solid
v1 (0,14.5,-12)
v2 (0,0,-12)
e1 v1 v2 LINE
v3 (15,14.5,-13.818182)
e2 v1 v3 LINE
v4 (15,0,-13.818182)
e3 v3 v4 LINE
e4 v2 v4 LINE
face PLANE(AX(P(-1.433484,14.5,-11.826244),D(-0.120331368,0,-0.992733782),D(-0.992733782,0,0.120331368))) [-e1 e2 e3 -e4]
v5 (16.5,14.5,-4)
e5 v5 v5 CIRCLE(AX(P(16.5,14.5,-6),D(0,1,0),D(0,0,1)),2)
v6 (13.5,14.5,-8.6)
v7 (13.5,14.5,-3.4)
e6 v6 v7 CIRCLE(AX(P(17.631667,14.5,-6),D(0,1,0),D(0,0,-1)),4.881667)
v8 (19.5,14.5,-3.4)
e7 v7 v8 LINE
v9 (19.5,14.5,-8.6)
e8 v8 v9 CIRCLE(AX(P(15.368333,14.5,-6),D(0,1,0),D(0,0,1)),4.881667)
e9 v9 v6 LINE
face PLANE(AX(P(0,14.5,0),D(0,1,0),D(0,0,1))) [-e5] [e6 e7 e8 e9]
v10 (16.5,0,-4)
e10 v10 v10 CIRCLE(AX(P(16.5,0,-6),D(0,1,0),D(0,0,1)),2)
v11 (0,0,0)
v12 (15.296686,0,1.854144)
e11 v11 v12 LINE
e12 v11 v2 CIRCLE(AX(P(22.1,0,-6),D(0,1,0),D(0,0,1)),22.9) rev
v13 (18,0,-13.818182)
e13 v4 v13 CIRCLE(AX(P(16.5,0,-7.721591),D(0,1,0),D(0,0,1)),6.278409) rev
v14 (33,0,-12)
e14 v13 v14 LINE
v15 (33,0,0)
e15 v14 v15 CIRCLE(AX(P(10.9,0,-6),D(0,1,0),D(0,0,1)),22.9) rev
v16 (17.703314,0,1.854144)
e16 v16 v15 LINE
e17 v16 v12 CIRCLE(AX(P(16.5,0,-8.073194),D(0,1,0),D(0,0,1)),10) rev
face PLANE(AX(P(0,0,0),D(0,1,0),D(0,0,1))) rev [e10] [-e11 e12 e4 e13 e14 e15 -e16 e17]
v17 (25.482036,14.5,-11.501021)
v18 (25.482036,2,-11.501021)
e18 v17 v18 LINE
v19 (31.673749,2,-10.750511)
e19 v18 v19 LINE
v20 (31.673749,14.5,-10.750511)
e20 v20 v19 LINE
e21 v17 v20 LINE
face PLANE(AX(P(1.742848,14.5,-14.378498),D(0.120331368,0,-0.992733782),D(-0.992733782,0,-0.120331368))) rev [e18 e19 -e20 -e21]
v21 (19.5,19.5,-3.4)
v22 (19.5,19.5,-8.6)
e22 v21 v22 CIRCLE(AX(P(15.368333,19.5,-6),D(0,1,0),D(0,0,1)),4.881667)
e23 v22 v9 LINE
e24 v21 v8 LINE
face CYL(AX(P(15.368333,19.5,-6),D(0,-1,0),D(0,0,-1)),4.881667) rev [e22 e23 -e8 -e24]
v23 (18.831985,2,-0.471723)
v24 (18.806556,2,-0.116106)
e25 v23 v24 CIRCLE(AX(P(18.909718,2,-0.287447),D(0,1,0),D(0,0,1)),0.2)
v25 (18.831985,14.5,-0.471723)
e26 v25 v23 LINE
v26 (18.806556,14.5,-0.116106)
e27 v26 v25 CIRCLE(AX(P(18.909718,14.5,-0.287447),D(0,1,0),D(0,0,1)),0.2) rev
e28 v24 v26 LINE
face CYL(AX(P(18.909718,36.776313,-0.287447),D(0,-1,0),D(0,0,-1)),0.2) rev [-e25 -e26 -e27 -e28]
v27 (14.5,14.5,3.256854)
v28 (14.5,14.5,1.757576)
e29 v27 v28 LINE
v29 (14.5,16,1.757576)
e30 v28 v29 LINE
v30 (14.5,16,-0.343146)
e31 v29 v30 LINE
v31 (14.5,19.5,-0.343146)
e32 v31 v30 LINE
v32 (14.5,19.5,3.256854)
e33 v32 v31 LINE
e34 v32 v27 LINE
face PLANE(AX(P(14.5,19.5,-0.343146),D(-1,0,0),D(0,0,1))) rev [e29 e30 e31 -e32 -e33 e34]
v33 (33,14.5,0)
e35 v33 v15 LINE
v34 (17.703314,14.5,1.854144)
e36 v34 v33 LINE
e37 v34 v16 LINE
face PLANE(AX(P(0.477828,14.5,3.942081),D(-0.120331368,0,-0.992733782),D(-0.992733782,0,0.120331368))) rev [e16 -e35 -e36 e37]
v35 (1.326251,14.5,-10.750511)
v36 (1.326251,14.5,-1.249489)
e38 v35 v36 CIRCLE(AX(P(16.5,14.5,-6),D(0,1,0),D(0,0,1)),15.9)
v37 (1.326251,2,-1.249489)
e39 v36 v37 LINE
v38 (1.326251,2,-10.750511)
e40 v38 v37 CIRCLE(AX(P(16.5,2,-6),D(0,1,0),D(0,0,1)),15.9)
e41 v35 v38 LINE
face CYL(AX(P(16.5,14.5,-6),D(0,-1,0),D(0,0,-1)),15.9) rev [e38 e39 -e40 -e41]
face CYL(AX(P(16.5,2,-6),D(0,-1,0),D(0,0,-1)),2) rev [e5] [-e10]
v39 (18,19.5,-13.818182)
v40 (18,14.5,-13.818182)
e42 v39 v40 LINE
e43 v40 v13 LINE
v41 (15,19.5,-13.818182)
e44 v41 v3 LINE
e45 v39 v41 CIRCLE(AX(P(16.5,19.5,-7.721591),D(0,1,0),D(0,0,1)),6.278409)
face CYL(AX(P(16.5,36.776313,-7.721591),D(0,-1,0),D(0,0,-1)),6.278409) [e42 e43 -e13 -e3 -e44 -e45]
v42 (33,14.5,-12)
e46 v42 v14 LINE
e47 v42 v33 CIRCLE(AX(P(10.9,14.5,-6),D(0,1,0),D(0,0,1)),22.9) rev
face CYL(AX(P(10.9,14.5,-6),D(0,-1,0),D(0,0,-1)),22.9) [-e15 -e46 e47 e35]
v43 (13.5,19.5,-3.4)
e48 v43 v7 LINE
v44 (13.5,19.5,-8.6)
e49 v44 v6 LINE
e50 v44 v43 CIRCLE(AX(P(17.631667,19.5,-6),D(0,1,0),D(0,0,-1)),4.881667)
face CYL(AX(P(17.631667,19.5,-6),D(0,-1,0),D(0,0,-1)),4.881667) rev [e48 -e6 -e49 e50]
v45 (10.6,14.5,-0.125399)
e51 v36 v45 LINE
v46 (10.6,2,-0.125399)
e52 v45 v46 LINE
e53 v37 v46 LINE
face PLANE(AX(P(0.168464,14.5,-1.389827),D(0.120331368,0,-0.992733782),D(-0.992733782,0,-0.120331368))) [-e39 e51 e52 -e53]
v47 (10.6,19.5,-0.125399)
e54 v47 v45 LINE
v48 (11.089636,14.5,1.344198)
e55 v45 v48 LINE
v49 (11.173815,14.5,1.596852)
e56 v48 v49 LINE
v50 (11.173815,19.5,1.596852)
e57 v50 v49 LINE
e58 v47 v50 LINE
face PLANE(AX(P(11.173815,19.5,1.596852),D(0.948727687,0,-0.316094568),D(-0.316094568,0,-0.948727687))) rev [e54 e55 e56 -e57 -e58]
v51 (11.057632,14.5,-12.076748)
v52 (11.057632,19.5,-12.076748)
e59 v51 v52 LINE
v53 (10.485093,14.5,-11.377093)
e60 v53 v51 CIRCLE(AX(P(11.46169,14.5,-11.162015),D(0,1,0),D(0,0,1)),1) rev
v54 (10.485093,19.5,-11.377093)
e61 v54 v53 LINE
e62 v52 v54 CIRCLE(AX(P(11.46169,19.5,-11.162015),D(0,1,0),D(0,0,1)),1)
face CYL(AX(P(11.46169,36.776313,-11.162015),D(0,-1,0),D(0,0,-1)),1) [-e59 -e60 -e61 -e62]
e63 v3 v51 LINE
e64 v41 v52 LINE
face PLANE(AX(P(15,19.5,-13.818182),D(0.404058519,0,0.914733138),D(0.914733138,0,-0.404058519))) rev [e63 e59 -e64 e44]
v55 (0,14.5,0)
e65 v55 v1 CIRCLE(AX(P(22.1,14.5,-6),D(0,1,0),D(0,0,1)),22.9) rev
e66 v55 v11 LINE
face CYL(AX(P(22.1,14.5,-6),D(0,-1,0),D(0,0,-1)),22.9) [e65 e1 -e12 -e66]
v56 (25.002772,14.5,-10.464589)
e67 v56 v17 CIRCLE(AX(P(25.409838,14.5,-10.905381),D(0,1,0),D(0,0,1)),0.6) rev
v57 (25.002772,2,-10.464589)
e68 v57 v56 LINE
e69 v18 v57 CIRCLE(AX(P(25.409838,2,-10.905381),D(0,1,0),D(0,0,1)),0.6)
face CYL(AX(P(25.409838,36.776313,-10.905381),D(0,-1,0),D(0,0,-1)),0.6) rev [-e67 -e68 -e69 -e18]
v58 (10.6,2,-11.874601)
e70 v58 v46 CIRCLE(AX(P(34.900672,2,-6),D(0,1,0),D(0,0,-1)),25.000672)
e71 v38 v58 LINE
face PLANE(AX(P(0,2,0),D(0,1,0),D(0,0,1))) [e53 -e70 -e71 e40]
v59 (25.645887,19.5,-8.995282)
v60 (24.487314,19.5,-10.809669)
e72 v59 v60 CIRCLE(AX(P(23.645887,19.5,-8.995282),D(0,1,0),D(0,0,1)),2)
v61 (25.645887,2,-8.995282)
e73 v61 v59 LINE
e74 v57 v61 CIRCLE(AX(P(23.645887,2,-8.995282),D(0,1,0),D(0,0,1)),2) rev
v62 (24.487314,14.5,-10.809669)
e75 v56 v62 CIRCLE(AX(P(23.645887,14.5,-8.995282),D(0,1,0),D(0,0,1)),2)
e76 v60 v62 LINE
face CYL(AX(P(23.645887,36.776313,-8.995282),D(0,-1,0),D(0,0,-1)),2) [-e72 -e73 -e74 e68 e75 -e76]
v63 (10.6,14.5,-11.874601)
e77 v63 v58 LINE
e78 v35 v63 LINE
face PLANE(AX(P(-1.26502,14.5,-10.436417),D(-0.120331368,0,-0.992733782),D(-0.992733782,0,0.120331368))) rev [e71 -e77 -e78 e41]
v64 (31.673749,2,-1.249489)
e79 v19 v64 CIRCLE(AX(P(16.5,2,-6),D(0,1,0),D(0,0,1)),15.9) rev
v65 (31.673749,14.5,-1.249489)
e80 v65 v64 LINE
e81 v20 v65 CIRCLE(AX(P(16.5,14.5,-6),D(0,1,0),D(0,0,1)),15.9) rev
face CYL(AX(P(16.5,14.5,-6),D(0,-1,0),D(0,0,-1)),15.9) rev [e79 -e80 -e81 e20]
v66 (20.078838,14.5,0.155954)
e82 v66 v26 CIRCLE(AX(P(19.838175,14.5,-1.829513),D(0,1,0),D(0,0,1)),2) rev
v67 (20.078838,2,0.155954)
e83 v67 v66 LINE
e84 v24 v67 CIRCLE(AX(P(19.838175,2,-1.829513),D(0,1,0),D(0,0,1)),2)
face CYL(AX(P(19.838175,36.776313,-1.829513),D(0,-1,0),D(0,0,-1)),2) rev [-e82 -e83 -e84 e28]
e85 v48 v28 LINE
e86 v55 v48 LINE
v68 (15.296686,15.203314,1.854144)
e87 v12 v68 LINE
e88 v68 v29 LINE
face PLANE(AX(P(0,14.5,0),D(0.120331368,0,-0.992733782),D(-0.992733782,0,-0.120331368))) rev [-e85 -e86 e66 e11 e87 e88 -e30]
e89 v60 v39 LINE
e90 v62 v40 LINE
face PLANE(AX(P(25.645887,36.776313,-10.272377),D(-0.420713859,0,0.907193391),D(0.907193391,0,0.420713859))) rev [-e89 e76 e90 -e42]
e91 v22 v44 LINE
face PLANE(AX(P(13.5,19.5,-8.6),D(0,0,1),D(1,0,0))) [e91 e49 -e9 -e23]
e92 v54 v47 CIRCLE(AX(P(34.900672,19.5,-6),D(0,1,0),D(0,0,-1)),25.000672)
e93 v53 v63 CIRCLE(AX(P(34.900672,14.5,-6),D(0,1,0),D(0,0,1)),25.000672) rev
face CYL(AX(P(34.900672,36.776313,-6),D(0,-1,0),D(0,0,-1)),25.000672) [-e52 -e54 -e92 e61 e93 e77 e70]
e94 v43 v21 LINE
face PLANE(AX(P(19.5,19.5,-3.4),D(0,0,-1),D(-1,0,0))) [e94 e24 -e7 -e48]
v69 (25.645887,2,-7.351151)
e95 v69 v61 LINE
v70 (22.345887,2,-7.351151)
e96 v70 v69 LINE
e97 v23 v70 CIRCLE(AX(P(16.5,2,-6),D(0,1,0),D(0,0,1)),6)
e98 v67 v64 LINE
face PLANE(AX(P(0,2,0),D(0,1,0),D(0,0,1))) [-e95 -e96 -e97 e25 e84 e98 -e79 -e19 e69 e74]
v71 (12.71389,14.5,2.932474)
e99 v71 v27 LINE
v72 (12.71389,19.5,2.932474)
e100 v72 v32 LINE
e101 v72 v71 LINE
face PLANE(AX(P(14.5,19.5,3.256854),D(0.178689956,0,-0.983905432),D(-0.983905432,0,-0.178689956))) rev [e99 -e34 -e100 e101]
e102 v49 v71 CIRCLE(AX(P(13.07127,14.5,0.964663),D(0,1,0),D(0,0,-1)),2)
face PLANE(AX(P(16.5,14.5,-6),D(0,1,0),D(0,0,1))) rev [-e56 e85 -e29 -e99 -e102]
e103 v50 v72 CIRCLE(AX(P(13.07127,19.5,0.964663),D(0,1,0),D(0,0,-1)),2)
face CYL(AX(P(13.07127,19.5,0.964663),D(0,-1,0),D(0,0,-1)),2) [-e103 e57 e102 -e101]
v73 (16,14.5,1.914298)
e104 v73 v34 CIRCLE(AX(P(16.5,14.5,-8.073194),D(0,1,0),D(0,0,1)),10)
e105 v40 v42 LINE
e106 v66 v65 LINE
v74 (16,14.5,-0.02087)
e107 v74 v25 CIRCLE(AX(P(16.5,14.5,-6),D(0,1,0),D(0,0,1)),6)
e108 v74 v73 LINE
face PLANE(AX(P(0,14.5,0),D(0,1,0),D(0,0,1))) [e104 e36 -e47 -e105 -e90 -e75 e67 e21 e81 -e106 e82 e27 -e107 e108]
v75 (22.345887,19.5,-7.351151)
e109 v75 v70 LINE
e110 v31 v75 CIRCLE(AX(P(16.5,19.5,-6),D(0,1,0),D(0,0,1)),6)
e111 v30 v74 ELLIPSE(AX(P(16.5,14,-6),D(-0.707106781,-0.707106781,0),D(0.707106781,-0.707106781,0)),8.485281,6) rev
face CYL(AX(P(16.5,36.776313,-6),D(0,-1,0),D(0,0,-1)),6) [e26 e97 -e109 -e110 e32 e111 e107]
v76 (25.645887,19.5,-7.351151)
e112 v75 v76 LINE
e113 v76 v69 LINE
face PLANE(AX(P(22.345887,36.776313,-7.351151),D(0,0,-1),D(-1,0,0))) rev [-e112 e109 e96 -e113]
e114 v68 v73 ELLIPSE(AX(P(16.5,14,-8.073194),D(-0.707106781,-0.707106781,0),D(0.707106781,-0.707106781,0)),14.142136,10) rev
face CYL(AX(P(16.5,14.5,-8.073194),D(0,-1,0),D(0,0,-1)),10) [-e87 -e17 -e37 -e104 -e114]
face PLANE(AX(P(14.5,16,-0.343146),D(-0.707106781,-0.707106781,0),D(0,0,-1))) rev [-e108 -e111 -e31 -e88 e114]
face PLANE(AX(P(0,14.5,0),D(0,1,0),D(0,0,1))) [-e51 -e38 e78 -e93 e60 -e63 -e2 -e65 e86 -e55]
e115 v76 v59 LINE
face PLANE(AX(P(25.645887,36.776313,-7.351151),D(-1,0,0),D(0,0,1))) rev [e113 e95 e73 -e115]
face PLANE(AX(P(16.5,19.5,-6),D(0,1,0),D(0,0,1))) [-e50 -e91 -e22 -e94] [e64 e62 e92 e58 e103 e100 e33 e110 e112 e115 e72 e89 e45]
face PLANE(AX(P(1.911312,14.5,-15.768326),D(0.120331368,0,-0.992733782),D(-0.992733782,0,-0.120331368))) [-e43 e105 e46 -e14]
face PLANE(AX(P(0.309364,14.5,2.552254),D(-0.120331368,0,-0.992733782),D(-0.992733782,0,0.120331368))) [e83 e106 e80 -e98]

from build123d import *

# Parameters (mm, degrees)
BOSS_EXTRUDE1_DEPTH = 14.5
SKETCH1_3_R         = 1.9999999999999996
BOSS_EXTRUDE2_DEPTH = 2
SKETCH2_R           = 1.9999999999999996
BOSS_EXTRUDE3_DEPTH = 12.5
BOSS_EXTRUDE4_START = -2
SKETCH2_2_R         = 1.9999999999999996
BOSS_EXTRUDE4_DEPTH = 2
BOSS_EXTRUDE5_DEPTH = 5
CHAMFER1_SIZE       = 1.5
FILLET3_R           = 2
FILLET1_R           = 0.6
FILLET4_R           = 2
FILLET5_R           = 0.2
FILLET6_R           = 1
FILLET7_R           = 10


with BuildPart() as part:
    # Sketch1 → Boss-Extrude1 (new body)
    with BuildSketch(Plane(origin=(0, 0, 0), x_dir=(1, 0, 0), z_dir=(0, 1, 0))):
        with BuildLine():
            ThreePointArc((33, 12), (33.8, 6), (33, 0))
            Line((33, 0), (16.499999999999837, -2.00000000000002))
            Line((16.499999999999837, -2.00000000000002), (0, 0))
            ThreePointArc((0, 0), (-0.7999999999999936, 5.999999999999997), (0, 12))
            Line((0, 12), (16.499999999999837, 13.99999999999998))
            Line((16.499999999999837, 13.99999999999998), (33, 12))
        make_face()
        with BuildLine():
            Line((16.49999999999997, 12.589752836725182), (31.673748690170243, 10.750510571250008))
            ThreePointArc((31.673748690170243, 10.750510571250008), (32.39999999999999, 5.999999999999953), (31.673748690170243, 1.2494894287498812))
            Line((31.673748690170243, 1.2494894287498812), (16.49999999999984, -0.5897528367253209))
            Line((16.49999999999984, -0.5897528367253209), (1.3262513098297308, 1.2494894287498826))
            ThreePointArc((1.3262513098297308, 1.2494894287498826), (0.5999999999999286, 5.999999999999944), (1.3262513098297308, 10.750510571250004))
            Line((1.3262513098297308, 10.750510571250004), (16.49999999999997, 12.589752836725182))
        make_face(mode=Mode.SUBTRACT)
    extrude(amount=BOSS_EXTRUDE1_DEPTH)

    # Sketch1<3> → Boss-Extrude2 (add)
    with BuildSketch(Plane(origin=(0, 0, 0), x_dir=(1, 0, 0), z_dir=(0, 1, 0))):
        with BuildLine():
            ThreePointArc((31.673748690170243, 10.750510571250008), (32.39999999999999, 5.999999999999953), (31.673748690170243, 1.2494894287498812))
            Line((31.673748690170243, 1.2494894287498812), (16.49999999999984, -0.5897528367253209))
            Line((16.49999999999984, -0.5897528367253209), (1.3262513098297308, 1.2494894287498826))
            ThreePointArc((1.3262513098297308, 1.2494894287498826), (0.5999999999999286, 5.999999999999944), (1.3262513098297308, 10.750510571250004))
            Line((1.3262513098297308, 10.750510571250004), (16.49999999999997, 12.589752836725182))
            Line((16.49999999999997, 12.589752836725182), (31.673748690170243, 10.750510571250008))
        make_face()
        with Locations(Location((16.499999999999837, 5.999999999999998, 0), (0, 0, 270))):
            Circle(SKETCH1_3_R, mode=Mode.SUBTRACT)
    extrude(amount=BOSS_EXTRUDE2_DEPTH)

    # Sketch2 → Boss-Extrude3 (add)
    with BuildSketch(Plane(origin=(0, 2, 0), x_dir=(1, 0, 0), z_dir=(0, 1, 0))):
        with BuildLine():
            Line((22.34588668015035, 7.351150962268389), (25.64588668015035, 7.351150962268389))
            Line((25.64588668015035, 7.351150962268389), (25.64588668015035, 10.27237722905159))
            Line((25.64588668015035, 10.27237722905159), (17.999999999999844, 13.818181818181802))
            ThreePointArc((17.999999999999844, 13.818181818181802), (16.499999999999844, 13.999999999999986), (14.999999999999844, 13.8181818181818))
            Line((14.999999999999844, 13.8181818181818), (10.599999999999836, 11.874601321573653))
            ThreePointArc((10.599999999999836, 11.874601321573653), (9.899999999999839, 5.999999999999933), (10.599999999999838, 0.12539867842620983))
            Line((10.599999999999838, 0.12539867842620983), (14.499999999999885, -1.7575757575757784))
            Line((14.499999999999885, -1.7575757575757784), (18.499999999999837, -1.7575757575757784))
            Line((18.499999999999837, -1.7575757575757784), (18.499999999999837, 0.34314575050761753))
            ThreePointArc((18.499999999999837, 0.34314575050761753), (21.75999227294638, 3.1133962363111447), (22.34588668015035, 7.351150962268389))
        make_face()
        with Locations(Location((16.499999999999837, 5.999999999999998, 0), (0, 0, 270))):
            Circle(SKETCH2_R, mode=Mode.SUBTRACT)
    extrude(amount=BOSS_EXTRUDE3_DEPTH)

    # Sketch2<2> → Boss-Extrude4 (add)
    with BuildSketch(Plane(origin=(0, 2, 0), x_dir=(1, 0, 0), z_dir=(0, 1, 0)).offset(BOSS_EXTRUDE4_START)):
        with BuildLine():
            Line((22.34588668015035, 7.351150962268389), (25.64588668015035, 7.351150962268389))
            Line((25.64588668015035, 7.351150962268389), (25.64588668015035, 10.27237722905159))
            Line((25.64588668015035, 10.27237722905159), (17.999999999999844, 13.818181818181802))
            ThreePointArc((17.999999999999844, 13.818181818181802), (16.499999999999844, 13.999999999999986), (14.999999999999844, 13.8181818181818))
            Line((14.999999999999844, 13.8181818181818), (10.599999999999836, 11.874601321573653))
            ThreePointArc((10.599999999999836, 11.874601321573653), (9.899999999999839, 5.999999999999933), (10.599999999999838, 0.12539867842620983))
            Line((10.599999999999838, 0.12539867842620983), (14.499999999999885, -1.7575757575757784))
            Line((14.499999999999885, -1.7575757575757784), (18.499999999999837, -1.7575757575757784))
            Line((18.499999999999837, -1.7575757575757784), (18.499999999999837, 0.34314575050761753))
            ThreePointArc((18.499999999999837, 0.34314575050761753), (21.75999227294638, 3.1133962363111447), (22.34588668015035, 7.351150962268389))
        make_face()
        with Locations(Location((16.499999999999837, 5.999999999999998, 0), (0, 0, 270))):
            Circle(SKETCH2_2_R, mode=Mode.SUBTRACT)
    extrude(amount=BOSS_EXTRUDE4_DEPTH)

    # Sketch3 → Boss-Extrude5 (add)
    with BuildSketch(Plane(origin=(0, 14.5, 0), x_dir=(1, 0, 0), z_dir=(0, 1, 0))):
        with BuildLine():
            Line((22.34588668015035, 7.351150962268389), (25.64588668015035, 7.351150962268389))
            Line((25.64588668015035, 7.351150962268389), (25.64588668015035, 10.27237722905159))
            Line((25.64588668015035, 10.27237722905159), (17.999999999999826, 13.81818181818181))
            ThreePointArc((17.999999999999826, 13.81818181818181), (16.499999999999833, 13.99999999999999), (14.999999999999844, 13.818181818181802))
            Line((14.999999999999844, 13.818181818181802), (10.599999999999836, 11.874601321573653))
            ThreePointArc((10.599999999999836, 11.874601321573653), (9.899999999999842, 5.999999999999933), (10.599999999999842, 0.12539867842621155))
            Line((10.599999999999842, 0.12539867842621155), (11.173814866283609, -1.5968518966374832))
            ThreePointArc((11.173814866283609, -1.5968518966374832), (11.760910789091948, -2.4756088583346414), (12.713890329463082, -2.932473626010398))
            Line((12.713890329463082, -2.932473626010398), (14.49999999999984, -3.2568542494923824))
            Line((14.49999999999984, -3.2568542494923824), (14.49999999999984, 0.3431457505076174))
            ThreePointArc((14.49999999999984, 0.3431457505076174), (20.496967019022676, 1.5251531144804868), (22.34588668015035, 7.351150962268389))
        make_face()
        with BuildLine():
            Line((13.499999999999838, 8.599999999999934), (19.499999999999837, 8.599999999999934))
            ThreePointArc((19.499999999999837, 8.599999999999934), (20.249999999999837, 5.999999999999933), (19.499999999999837, 3.3999999999999324))
            Line((19.499999999999837, 3.3999999999999324), (13.499999999999838, 3.3999999999999324))
            ThreePointArc((13.499999999999838, 3.3999999999999324), (12.749999999999837, 5.999999999999932), (13.499999999999838, 8.599999999999934))
        make_face(mode=Mode.SUBTRACT)
    extrude(amount=BOSS_EXTRUDE5_DEPTH)

    # Chamfer1
    chamfer1_edges = [part.edges().sort_by_distance(p)[0] for p in [
        (14.49999999999984, 14.5, 0.7072150035340781),
    ]]
    chamfer(chamfer1_edges, length=CHAMFER1_SIZE)

    # Fillet3
    fillet3_edges = [part.edges().sort_by_distance(p)[0] for p in [
        (25.64588668015035, 10.75, -10.27237722905159),
    ]]
    fillet(fillet3_edges, radius=FILLET3_R)

    # Fillet1
    # the kernel refuses this fillet: 0.6 mm, written as the material it adds along each edge
    with BuildSketch(Plane(origin=(22.11701590469639, 2, -11.90890242403471), x_dir=(0.8942491782496095, 0, 0.44756944399712767), z_dir=(0, 1, 0))) as fillet1_piece_1:
        with BuildLine():
            CenterArc((3.393748585617257, 0.5763680275818249), FILLET1_R, 109.67662149320171, 144.1891632768265)
            Line((3.1917219374131016, 1.1413328348179872), (3.16141794018248, 1.2260775559034116))
            Line((3.16141794018248, 1.2260775559034116), (-0.03030399723062558, 0.08474472108542427))
            Line((-0.03030399723062558, 0.08474472108542427), (0.00268281172049191, -0.08996000512045559))
            ThreePointArc((0.00268281172049191, -0.08996000512045559), (2.614303647054314, -0.01207553882752912), (3.2020056235731444, -0.08645520413727262))
            Line((3.2020056235731444, -0.08645520413727262), (3.227015575144115, 1e-16))
        make_face()
    extrude(amount=12.5)

    # Fillet4
    # the kernel refuses this fillet: 2 mm, written as the material it adds along each edge
    with BuildSketch(Plane(origin=(18.499999999999837, 14.5, 0.34732859430107876), x_dir=(0.9927337820337083, 0, -0.12033136751923736), z_dir=(0, -1, 0))) as fillet4_piece_1:
        with BuildLine():
            CenterArc((1.5903936692052363, -2.0000000000000004), FILLET4_R, 89.99999999999994, 48.90789553913825)
            Line((0.08308572214778008, -0.6854572077191857), (0, 0))
            Line((0, 0), (1.5903936692052383, -1e-17))
        make_face()
    extrude(amount=12.5)

    # Fillet5
    fillet5_edges = [part.edges().sort_by_distance(p)[0] for p in [
        (18.499999999999837, 8.25, -0.34314575050761803),
    ]]
    fillet(fillet5_edges, radius=FILLET5_R)

    # Fillet6
    fillet6_edges = [part.edges().sort_by_distance(p)[0] for p in [
        (10.599999999999834, 17, -11.874601321573653),
    ]]
    fillet(fillet6_edges, radius=FILLET6_R)

    # Fillet7
    fillet7_edges = [part.edges().sort_by_distance(p)[0] for p in [
        (16.499999999999837, 7.25, 2.00000000000002),
    ]]
    fillet(fillet7_edges, radius=FILLET7_R)


solid = part.part
